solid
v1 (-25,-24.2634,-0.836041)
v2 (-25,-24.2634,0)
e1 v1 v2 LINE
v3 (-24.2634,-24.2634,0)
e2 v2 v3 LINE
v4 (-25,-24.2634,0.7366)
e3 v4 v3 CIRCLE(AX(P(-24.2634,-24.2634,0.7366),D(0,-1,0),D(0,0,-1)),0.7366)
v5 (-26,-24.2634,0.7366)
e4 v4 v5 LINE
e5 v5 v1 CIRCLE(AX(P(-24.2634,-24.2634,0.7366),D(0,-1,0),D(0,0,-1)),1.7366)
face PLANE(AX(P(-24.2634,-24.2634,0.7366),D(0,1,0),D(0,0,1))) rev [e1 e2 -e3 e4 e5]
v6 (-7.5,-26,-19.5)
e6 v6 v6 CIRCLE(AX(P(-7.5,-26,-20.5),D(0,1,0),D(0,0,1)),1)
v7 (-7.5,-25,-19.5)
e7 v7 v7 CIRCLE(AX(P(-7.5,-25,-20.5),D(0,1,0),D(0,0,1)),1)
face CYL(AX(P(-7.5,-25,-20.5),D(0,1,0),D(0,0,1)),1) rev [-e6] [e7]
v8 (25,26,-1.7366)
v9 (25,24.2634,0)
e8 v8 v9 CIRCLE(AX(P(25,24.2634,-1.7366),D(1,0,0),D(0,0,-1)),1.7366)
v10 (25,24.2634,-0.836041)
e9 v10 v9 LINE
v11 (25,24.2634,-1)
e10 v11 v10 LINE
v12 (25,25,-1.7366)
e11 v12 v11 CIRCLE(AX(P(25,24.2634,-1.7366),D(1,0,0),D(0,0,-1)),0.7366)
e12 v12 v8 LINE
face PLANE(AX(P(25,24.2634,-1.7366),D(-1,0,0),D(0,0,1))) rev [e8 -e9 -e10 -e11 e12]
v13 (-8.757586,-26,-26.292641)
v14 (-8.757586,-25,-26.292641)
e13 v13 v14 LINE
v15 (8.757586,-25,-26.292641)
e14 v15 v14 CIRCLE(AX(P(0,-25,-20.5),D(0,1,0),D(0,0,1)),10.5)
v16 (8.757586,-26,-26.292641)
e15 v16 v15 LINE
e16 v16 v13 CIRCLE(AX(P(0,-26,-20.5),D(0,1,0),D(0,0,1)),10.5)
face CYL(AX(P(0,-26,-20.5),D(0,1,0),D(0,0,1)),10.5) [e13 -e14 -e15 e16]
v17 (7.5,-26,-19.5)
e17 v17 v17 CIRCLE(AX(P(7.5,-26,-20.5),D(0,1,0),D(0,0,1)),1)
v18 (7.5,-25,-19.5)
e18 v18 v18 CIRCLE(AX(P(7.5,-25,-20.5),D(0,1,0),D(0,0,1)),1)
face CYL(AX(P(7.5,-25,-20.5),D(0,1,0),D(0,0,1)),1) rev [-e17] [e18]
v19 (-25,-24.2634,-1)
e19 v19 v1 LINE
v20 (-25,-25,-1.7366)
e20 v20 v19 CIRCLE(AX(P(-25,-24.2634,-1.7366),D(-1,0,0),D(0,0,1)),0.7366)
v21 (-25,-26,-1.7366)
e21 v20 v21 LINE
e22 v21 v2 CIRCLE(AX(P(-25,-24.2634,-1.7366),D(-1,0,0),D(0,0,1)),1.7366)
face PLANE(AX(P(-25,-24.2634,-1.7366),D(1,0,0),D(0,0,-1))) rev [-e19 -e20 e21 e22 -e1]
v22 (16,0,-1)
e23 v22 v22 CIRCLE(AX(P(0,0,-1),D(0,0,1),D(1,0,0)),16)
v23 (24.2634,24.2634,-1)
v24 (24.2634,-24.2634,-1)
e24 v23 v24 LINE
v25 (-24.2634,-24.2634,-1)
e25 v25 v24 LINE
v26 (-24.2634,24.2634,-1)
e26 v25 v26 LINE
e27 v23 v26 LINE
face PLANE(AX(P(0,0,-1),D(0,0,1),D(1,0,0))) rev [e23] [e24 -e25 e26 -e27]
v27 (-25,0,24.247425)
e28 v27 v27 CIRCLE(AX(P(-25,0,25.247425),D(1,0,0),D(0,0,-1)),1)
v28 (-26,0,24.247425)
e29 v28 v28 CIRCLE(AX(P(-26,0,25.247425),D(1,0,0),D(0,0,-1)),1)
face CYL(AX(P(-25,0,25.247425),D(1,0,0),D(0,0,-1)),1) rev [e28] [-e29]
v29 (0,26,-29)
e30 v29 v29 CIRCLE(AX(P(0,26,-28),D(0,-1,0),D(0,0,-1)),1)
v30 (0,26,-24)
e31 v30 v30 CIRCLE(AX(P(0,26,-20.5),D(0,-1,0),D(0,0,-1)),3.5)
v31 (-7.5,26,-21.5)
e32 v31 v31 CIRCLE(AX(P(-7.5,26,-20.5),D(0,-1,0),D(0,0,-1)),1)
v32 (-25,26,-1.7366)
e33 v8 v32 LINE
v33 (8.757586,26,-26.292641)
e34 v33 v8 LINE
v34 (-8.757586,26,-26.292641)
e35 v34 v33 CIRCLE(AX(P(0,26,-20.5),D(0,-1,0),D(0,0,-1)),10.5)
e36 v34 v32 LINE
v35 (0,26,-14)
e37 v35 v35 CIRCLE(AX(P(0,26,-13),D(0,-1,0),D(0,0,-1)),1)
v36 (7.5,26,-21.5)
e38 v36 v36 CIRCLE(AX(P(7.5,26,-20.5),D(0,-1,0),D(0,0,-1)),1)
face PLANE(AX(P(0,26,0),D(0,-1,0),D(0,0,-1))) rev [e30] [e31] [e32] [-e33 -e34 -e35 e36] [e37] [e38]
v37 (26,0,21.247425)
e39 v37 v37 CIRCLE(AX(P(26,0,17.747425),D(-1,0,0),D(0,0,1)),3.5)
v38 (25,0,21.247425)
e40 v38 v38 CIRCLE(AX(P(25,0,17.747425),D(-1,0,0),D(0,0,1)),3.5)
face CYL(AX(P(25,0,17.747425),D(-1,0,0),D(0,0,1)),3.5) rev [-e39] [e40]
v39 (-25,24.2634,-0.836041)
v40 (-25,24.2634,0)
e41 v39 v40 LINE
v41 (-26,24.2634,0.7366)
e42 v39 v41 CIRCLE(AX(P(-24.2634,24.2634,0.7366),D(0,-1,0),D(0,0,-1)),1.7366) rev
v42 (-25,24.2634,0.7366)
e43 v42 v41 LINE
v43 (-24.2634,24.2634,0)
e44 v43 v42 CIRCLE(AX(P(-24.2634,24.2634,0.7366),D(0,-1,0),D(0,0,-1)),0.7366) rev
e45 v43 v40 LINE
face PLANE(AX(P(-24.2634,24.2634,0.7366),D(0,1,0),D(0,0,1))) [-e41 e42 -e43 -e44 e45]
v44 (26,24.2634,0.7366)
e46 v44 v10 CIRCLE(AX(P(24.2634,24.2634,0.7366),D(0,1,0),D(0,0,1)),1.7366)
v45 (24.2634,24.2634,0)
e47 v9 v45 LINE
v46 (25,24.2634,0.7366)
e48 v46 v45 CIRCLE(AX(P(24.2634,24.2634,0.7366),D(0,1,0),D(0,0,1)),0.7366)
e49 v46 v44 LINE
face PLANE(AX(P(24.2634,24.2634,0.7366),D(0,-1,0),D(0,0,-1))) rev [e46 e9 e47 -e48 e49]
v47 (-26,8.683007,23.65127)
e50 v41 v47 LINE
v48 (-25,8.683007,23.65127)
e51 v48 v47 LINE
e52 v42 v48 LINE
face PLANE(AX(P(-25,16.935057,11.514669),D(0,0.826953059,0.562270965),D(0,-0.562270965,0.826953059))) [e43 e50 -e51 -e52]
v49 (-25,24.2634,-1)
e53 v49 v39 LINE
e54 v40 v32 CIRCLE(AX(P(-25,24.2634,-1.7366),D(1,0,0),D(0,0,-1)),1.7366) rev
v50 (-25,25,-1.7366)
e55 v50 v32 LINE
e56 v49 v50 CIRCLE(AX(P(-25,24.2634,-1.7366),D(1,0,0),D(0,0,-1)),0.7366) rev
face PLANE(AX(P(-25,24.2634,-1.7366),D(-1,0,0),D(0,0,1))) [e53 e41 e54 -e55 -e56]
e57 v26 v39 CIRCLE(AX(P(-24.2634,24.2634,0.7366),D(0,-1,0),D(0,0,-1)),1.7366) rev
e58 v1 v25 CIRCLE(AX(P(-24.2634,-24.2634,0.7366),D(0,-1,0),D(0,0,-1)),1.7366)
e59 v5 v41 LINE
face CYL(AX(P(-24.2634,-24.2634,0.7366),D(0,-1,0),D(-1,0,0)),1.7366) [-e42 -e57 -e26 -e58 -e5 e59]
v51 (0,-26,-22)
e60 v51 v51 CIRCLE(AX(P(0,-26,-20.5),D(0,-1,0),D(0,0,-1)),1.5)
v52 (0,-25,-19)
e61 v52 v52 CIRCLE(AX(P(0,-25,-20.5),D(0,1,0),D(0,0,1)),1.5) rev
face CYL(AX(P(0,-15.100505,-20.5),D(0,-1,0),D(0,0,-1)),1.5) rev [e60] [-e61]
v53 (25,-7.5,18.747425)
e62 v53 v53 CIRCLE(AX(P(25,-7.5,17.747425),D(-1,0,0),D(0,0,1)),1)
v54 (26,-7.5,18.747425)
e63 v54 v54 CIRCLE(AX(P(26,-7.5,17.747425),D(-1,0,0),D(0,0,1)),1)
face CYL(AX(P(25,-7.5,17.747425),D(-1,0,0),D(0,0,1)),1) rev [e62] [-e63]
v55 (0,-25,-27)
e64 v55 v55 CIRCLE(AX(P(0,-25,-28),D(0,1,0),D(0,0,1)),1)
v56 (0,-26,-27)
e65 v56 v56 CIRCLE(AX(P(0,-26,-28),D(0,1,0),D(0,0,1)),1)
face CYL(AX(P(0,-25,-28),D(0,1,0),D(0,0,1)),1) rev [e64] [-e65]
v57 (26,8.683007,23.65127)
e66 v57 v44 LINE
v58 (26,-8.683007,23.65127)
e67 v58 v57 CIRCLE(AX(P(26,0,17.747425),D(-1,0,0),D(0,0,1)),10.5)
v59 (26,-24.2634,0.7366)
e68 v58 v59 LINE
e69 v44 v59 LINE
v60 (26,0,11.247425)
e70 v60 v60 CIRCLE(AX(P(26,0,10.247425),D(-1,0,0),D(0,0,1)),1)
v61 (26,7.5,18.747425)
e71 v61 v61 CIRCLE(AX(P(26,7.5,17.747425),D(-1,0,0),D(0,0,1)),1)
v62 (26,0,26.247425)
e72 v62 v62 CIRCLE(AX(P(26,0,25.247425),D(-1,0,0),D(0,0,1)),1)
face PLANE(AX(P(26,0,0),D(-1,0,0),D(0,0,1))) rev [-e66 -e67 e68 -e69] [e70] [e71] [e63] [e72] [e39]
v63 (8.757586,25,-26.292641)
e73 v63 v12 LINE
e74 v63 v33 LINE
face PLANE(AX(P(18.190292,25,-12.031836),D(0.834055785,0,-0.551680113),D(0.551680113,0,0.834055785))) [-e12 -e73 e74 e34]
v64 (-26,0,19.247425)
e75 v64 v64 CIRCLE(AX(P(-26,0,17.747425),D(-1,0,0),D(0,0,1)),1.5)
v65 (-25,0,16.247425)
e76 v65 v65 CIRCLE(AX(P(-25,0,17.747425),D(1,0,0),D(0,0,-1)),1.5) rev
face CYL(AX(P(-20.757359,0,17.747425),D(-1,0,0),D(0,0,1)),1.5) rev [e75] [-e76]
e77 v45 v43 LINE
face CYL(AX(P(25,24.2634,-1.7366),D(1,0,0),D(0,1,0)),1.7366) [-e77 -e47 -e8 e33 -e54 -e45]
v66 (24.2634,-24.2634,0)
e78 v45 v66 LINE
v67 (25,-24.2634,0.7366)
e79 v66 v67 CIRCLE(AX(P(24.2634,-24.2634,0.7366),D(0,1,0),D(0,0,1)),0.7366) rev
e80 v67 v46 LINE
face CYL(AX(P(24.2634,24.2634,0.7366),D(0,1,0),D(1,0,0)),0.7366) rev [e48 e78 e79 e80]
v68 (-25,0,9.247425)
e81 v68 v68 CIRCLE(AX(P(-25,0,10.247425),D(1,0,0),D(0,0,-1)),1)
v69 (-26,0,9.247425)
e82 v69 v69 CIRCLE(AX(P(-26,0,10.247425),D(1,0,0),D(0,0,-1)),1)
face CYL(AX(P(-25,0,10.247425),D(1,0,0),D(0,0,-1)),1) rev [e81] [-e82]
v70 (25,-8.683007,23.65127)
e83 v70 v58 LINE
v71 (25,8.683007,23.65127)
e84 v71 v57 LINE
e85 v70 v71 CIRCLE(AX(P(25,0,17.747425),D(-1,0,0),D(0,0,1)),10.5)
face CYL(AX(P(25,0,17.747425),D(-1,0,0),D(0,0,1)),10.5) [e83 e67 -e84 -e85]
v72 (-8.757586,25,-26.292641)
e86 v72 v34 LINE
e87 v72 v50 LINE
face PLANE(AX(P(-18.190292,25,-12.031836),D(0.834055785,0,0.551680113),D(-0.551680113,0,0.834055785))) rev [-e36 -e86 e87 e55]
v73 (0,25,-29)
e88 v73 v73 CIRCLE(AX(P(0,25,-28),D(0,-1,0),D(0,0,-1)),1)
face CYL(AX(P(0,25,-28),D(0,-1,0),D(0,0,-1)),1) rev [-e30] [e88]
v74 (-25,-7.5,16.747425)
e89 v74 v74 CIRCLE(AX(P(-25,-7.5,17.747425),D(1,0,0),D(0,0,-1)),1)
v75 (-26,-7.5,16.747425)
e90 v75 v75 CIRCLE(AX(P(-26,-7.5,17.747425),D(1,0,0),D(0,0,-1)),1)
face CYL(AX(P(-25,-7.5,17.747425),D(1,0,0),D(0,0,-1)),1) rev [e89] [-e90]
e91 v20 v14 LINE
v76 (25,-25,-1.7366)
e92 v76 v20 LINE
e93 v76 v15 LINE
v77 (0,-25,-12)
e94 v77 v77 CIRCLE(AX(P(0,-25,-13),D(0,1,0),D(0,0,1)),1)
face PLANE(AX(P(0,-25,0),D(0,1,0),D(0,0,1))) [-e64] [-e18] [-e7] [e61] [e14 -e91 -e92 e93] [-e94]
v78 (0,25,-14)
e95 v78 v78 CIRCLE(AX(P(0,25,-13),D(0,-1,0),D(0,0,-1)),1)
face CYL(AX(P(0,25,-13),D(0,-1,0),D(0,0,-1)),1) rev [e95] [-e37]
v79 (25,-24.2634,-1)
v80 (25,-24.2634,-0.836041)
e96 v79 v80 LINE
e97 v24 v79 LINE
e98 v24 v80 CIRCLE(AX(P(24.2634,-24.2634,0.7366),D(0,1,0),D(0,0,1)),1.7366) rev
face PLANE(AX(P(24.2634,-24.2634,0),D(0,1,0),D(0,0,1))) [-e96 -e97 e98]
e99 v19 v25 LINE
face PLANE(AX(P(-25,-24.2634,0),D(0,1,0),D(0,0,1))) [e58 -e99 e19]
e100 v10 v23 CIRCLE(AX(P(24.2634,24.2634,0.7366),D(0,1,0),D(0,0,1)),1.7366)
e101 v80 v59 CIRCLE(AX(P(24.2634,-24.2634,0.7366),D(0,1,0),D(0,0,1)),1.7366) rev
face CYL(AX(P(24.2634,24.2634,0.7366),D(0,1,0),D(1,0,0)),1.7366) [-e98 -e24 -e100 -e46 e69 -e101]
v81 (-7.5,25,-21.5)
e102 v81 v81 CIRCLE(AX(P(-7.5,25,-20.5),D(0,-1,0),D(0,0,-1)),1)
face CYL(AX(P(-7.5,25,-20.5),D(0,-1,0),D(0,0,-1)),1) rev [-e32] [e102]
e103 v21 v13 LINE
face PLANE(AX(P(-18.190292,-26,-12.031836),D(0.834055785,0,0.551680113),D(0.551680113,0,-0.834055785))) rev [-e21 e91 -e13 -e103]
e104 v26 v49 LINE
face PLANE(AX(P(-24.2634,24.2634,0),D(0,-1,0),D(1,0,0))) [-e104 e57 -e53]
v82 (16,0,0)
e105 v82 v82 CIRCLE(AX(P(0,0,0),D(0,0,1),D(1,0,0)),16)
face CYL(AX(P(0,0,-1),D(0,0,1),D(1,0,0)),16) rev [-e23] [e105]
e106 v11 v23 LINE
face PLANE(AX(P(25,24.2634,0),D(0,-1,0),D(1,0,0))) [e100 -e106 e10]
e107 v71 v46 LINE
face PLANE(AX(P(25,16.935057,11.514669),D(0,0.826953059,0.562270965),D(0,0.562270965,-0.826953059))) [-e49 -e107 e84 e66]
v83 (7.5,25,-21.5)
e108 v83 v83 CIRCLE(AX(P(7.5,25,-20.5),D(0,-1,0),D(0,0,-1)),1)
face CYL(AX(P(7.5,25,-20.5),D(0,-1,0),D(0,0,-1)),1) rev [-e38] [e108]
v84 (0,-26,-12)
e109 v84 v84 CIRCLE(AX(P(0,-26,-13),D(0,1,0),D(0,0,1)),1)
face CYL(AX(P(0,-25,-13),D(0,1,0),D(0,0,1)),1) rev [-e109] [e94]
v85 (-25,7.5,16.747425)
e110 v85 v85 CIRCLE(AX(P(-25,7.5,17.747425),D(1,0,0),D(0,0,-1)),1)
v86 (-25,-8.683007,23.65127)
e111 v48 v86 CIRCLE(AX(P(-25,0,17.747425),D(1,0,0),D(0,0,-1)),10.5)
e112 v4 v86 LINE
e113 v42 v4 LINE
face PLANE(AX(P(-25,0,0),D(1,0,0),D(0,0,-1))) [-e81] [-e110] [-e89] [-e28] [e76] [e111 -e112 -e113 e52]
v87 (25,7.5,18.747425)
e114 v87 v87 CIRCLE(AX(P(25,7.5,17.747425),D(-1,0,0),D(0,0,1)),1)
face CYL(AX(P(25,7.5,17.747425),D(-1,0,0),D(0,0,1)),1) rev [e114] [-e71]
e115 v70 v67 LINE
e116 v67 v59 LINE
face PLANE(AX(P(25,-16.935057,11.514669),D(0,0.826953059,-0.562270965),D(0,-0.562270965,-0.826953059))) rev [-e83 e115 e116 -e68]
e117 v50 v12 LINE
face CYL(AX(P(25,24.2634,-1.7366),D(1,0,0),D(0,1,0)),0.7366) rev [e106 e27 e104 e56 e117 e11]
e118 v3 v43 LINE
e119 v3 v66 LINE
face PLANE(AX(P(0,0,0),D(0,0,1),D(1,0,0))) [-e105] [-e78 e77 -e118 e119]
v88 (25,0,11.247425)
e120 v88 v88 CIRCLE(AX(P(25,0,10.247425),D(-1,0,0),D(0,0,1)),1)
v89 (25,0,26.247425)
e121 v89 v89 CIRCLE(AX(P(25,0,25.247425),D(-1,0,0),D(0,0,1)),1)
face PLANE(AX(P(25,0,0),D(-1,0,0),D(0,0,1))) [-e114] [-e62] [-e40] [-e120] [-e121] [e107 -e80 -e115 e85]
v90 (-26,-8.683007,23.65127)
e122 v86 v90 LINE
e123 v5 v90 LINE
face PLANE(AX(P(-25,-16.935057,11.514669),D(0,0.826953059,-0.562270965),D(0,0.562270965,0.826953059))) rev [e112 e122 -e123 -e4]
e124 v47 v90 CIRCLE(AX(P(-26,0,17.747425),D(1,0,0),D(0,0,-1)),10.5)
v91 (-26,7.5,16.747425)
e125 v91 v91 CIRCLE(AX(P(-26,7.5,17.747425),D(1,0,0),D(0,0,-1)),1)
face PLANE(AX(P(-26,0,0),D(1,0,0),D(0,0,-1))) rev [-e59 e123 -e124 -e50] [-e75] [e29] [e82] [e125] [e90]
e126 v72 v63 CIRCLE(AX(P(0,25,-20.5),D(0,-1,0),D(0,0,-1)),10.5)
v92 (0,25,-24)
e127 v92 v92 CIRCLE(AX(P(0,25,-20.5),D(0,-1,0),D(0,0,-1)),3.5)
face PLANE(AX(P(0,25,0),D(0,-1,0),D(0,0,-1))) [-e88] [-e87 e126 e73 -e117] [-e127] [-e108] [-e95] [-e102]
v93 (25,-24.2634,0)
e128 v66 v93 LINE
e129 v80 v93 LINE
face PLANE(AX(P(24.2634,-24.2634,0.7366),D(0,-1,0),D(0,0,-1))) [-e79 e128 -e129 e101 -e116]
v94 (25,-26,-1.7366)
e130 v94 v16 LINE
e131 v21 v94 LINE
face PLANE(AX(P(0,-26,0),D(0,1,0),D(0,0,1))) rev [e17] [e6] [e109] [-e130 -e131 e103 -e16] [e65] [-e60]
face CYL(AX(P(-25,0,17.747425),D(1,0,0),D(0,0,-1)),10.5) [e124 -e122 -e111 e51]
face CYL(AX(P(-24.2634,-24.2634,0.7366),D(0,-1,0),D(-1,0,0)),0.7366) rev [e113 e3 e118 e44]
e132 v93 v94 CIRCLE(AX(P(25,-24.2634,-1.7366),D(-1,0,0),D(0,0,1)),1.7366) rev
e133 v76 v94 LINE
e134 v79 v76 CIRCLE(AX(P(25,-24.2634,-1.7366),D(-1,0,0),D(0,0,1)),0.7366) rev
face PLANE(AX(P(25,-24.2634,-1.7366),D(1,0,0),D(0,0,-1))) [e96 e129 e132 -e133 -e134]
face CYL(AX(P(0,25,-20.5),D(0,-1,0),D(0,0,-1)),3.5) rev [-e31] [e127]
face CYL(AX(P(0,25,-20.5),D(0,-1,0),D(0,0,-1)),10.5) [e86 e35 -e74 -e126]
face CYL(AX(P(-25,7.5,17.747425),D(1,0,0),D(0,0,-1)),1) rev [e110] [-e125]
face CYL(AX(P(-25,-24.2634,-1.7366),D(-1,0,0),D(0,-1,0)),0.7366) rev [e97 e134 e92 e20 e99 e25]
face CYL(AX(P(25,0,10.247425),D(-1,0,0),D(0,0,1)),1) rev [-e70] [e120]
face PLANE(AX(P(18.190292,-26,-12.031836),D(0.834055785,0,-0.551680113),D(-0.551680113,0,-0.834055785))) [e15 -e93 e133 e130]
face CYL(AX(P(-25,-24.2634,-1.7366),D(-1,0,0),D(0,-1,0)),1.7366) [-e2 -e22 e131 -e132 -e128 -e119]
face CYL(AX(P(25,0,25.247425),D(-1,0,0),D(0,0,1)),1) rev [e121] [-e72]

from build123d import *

# Parameters (mm, degrees)
SKETCH_1_W                         = 50
SKETCH_1_H                         = 50
SKETCH_1_R                         = 16
SM_BASE_FLANGE_1_DEPTH             = 1
SM_EDGE_FLANGE_1_STRIP_W           = 5.4732
SM_EDGE_FLANGE_1_STRIP_H           = 1
SM_EDGE_FLANGE_1_STRIP_CUT_DEPTH   = 50
SM_EDGE_FLANGE_1_STRIP_2_W         = 5.4732
SM_EDGE_FLANGE_1_STRIP_2_H         = 1
SM_EDGE_FLANGE_1_STRIP_CUT_2_DEPTH = 50
SM_EDGE_FLANGE_1_DEPTH             = 50
SM_EDGE_FLANGE_1_BEND_DEPTH        = 50
SM_EDGE_FLANGE_2_STRIP_W           = 5.4732
SM_EDGE_FLANGE_2_STRIP_H           = 1
SM_EDGE_FLANGE_2_STRIP_CUT_DEPTH   = 48.5268
SM_EDGE_FLANGE_2_STRIP_2_W         = 5.4732
SM_EDGE_FLANGE_2_STRIP_2_H         = 1
SM_EDGE_FLANGE_2_STRIP_CUT_2_DEPTH = 48.5268
SM_EDGE_FLANGE_2_DEPTH             = 48.5268
SM_EDGE_FLANGE_2_BEND_DEPTH        = 48.5268
SKETCH_23_R                        = 1
CUT_EXTRUDE_1_DEPTH                = 98
CUT_EXTRUDE_3_REACH                = 67.886
SKETCH_27_R                        = 3.5
SKETCH_27_R_2                      = 1
EXTRUDE_START                      = -1
SKETCH_30_R                        = 3.5
SKETCH_30_R_2                      = 1.5
EXTRUDE_1_DEPTH                    = 1
SKETCH_33_R                        = 3.5
EXTRUDE_2_DEPTH                    = 1
SKETCH_36_R                        = 1.5
CUT_EXTRUDE_4_DEPTH                = 1


# Sheet-metal steps are written as plain solids
with BuildPart() as part:
    # Sketch 1 → 基材-凸緣1 (new body)
    with BuildSketch(Plane.XY):
        Rectangle(SKETCH_1_W, SKETCH_1_H)
        Circle(SKETCH_1_R, mode=Mode.SUBTRACT)
    extrude(amount=-SM_BASE_FLANGE_1_DEPTH)

    # 邊線-凸緣1 strip (across the edge) → 邊線-凸緣1 strip cut (cut)
    with BuildSketch(Plane(origin=(-25, 25, -1), x_dir=(0, -1, 0), z_dir=(1, 0, 0))):
        with Locations((-2, -0.5)):
            Rectangle(SM_EDGE_FLANGE_1_STRIP_W, SM_EDGE_FLANGE_1_STRIP_H)
    extrude(amount=SM_EDGE_FLANGE_1_STRIP_CUT_DEPTH, mode=Mode.SUBTRACT)

    # 邊線-凸緣1 strip 2 (across the edge) → 邊線-凸緣1 strip cut 2 (cut)
    with BuildSketch(Plane(origin=(25, -25, -1), x_dir=(0, 1, 0), z_dir=(-1, 0, 0))):
        with Locations((-2, -0.5)):
            Rectangle(SM_EDGE_FLANGE_1_STRIP_2_W, SM_EDGE_FLANGE_1_STRIP_2_H)
    extrude(amount=SM_EDGE_FLANGE_1_STRIP_CUT_2_DEPTH, mode=Mode.SUBTRACT)

    # 邊線-凸緣1 section (across the edge) → 邊線-凸緣1 (add)
    with BuildSketch(Plane(origin=(-25, 25, -1), x_dir=(0, -1, 0), z_dir=(1, 0, 0))):
        with BuildLine():
            Line((-1, 0.7366), (-1, 30))
            Line((-1, 30), (0, 30))
            Line((0, 30), (0, 0.7366))
            ThreePointArc((0, 0.7366), (0.215745145, 0.215745145), (0.7366, 0))
            Line((0.7366, 0), (0.7366, -1))
            ThreePointArc((0.7366, -1), (-0.491361636, -0.491361636), (-1, 0.7366))
        make_face()
    extrude(amount=SM_EDGE_FLANGE_1_DEPTH)

    # 邊線-凸緣1 section 2 (across the edge) → 邊線-凸緣1 bend (add)
    with BuildSketch(Plane(origin=(25, -25, -1), x_dir=(0, 1, 0), z_dir=(-1, 0, 0))):
        with BuildLine():
            Line((-1, 0.7366), (-1, 30))
            Line((-1, 30), (0, 30))
            Line((0, 30), (0, 0.7366))
            ThreePointArc((0, 0.7366), (0.215745145, 0.215745145), (0.7366, 0))
            Line((0.7366, 0), (0.7366, -1))
            ThreePointArc((0.7366, -1), (-0.491361636, -0.491361636), (-1, 0.7366))
        make_face()
    extrude(amount=SM_EDGE_FLANGE_1_BEND_DEPTH)

    # 邊線-凸緣2 strip (across the edge) → 邊線-凸緣2 strip cut (cut)
    with BuildSketch(Plane(origin=(25, -24.2634, 0), x_dir=(-1, 0, 0), z_dir=(0, 1, 0))):
        with Locations((-2, -0.5)):
            Rectangle(SM_EDGE_FLANGE_2_STRIP_W, SM_EDGE_FLANGE_2_STRIP_H)
    extrude(amount=SM_EDGE_FLANGE_2_STRIP_CUT_DEPTH, mode=Mode.SUBTRACT)

    # 邊線-凸緣2 strip 2 (across the edge) → 邊線-凸緣2 strip cut 2 (cut)
    with BuildSketch(Plane(origin=(-25, 24.2634, 0), x_dir=(1, 0, 0), z_dir=(0, -1, 0))):
        with Locations((-2, -0.5)):
            Rectangle(SM_EDGE_FLANGE_2_STRIP_2_W, SM_EDGE_FLANGE_2_STRIP_2_H)
    extrude(amount=SM_EDGE_FLANGE_2_STRIP_CUT_2_DEPTH, mode=Mode.SUBTRACT)

    # 邊線-凸緣2 section (across the edge) → 邊線-凸緣2 (add)
    with BuildSketch(Plane(origin=(25, -24.2634, 0), x_dir=(-1, 0, 0), z_dir=(0, 1, 0))):
        with BuildLine():
            Line((-1, 0.7366), (-1, 30))
            Line((-1, 30), (0, 30))
            Line((0, 30), (0, 0.7366))
            ThreePointArc((0, 0.7366), (0.215745145, 0.215745145), (0.7366, 0))
            Line((0.7366, 0), (0.7366, -1))
            ThreePointArc((0.7366, -1), (-0.491361636, -0.491361636), (-1, 0.7366))
        make_face()
    extrude(amount=SM_EDGE_FLANGE_2_DEPTH)

    # 邊線-凸緣2 section 2 (across the edge) → 邊線-凸緣2 bend (add)
    with BuildSketch(Plane(origin=(-25, 24.2634, 0), x_dir=(1, 0, 0), z_dir=(0, -1, 0))):
        with BuildLine():
            Line((-1, 0.7366), (-1, 30))
            Line((-1, 30), (0, 30))
            Line((0, 30), (0, 0.7366))
            ThreePointArc((0, 0.7366), (0.215745145, 0.215745145), (0.7366, 0))
            Line((0.7366, 0), (0.7366, -1))
            ThreePointArc((0.7366, -1), (-0.491361636, -0.491361636), (-1, 0.7366))
        make_face()
    extrude(amount=SM_EDGE_FLANGE_2_BEND_DEPTH)

    # 草圖23 → 除料-伸長1 (cut)
    with BuildSketch(Plane(origin=(0, 26, 0), x_dir=(1, 0, 0), z_dir=(0, 1, 0))):
        with BuildLine():
            Line((25, 31), (0, 31))
            ThreePointArc((0, 31), (4.971280899, 29.748587256), (8.757585745, 26.292641186))
            Line((8.757585745, 26.292641186), (25, 1.7366))
            Line((25, 1.7366), (25, 31))
        make_face()
        with BuildLine():
            ThreePointArc((-8.757585745, 26.292641186), (-4.971280899, 29.748587256), (0, 31))
            Line((0, 31), (-25, 31))
            Line((-25, 31), (-25, 1.7366))
            Line((-25, 1.7366), (-8.757585745, 26.292641186))
        make_face()
        with BuildLine():
            ThreePointArc((1, 28), (0.707106781, 28.707106781), (0, 29))
            Line((0, 29), (0, 27))
            ThreePointArc((0, 27), (0.707106781, 27.292893219), (1, 28))
        make_face()
        with BuildLine():
            Line((0, 27), (0, 29))
            ThreePointArc((0, 29), (-1, 28), (0, 27))
        make_face()
        with Locations(Location((-7.5, 20.5, 0), (0, 0, 90))):
            Circle(SKETCH_23_R)
        with Locations(Location((7.5, 20.5, 0), (0, 0, 90))):
            Circle(SKETCH_23_R)
        with BuildLine():
            ThreePointArc((1, 13), (0.707106781, 13.707106781), (0, 14))
            Line((0, 14), (0, 12))
            ThreePointArc((0, 12), (0.707106781, 12.292893219), (1, 13))
        make_face()
        with BuildLine():
            Line((0, 12), (0, 14))
            ThreePointArc((0, 14), (-1, 13), (0, 12))
        make_face()
        with BuildLine():
            ThreePointArc((3.5, 20.5), (2.474873734, 22.974873734), (0, 24))
            Line((0, 24), (0, 17))
            ThreePointArc((0, 17), (2.474873734, 18.025126266), (3.5, 20.5))
        make_face()
        with BuildLine():
            Line((0, 17), (0, 24))
            ThreePointArc((0, 24), (-3.5, 20.5), (0, 17))
        make_face()
    extrude(amount=-CUT_EXTRUDE_1_DEPTH, mode=Mode.SUBTRACT)

    # 除料-伸長3: up to this face of the body (flat: up to its plane)
    cut_extrude_3_end = Plane(part.part.faces().sort_by_distance((-26, 0, 15.3683))[0])
    # 草圖27 → 除料-伸長3 (cut, up to the picked face)
    with BuildSketch(Plane(origin=(26, 0, 0), x_dir=(0, 0, -1), z_dir=(1, 0, 0)), mode=Mode.PRIVATE) as cut_extrude_3_sk1:
        with BuildLine():
            Line((-30, -24.2634), (-0.7366, -24.2634))
            Line((-0.7366, -24.2634), (-23.651269893, -8.68300712))
            ThreePointArc((-23.651269893, -8.68300712), (-28.24742476, 0), (-23.651269893, 8.68300712))
            Line((-23.651269893, 8.68300712), (-0.7366, 24.2634))
            Line((-0.7366, 24.2634), (-30, 24.2634))
            Line((-30, 24.2634), (-30, -24.2634))
        make_face()
    cut_extrude_3_tool1 = split(extrude(cut_extrude_3_sk1.sketch, amount=-CUT_EXTRUDE_3_REACH, mode=Mode.PRIVATE), bisect_by=cut_extrude_3_end, keep=Keep.BOTH, mode=Mode.PRIVATE)
    # 草圖27 → 除料-伸長3 (cut, up to the picked face)
    with BuildSketch(Plane(origin=(26, 0, 0), x_dir=(0, 0, -1), z_dir=(1, 0, 0)), mode=Mode.PRIVATE) as cut_extrude_3_sk2:
        with Locations(Location((-17.74742476, 0, 0), (0, 0, 180))):
            Circle(SKETCH_27_R)
    cut_extrude_3_tool2 = split(extrude(cut_extrude_3_sk2.sketch, amount=-CUT_EXTRUDE_3_REACH, mode=Mode.PRIVATE), bisect_by=cut_extrude_3_end, keep=Keep.BOTH, mode=Mode.PRIVATE)
    # 草圖27 → 除料-伸長3 (cut, up to the picked face)
    with BuildSketch(Plane(origin=(26, 0, 0), x_dir=(0, 0, -1), z_dir=(1, 0, 0)), mode=Mode.PRIVATE) as cut_extrude_3_sk3:
        with Locations(Location((-17.74742476, -7.5, 0), (0, 0, 180))):
            Circle(SKETCH_27_R_2)
    cut_extrude_3_tool3 = split(extrude(cut_extrude_3_sk3.sketch, amount=-CUT_EXTRUDE_3_REACH, mode=Mode.PRIVATE), bisect_by=cut_extrude_3_end, keep=Keep.BOTH, mode=Mode.PRIVATE)
    # 草圖27 → 除料-伸長3 (cut, up to the picked face)
    with BuildSketch(Plane(origin=(26, 0, 0), x_dir=(0, 0, -1), z_dir=(1, 0, 0)), mode=Mode.PRIVATE) as cut_extrude_3_sk4:
        with Locations(Location((-25.24742476, 0, 0), (0, 0, 180))):
            Circle(SKETCH_27_R_2)
    cut_extrude_3_tool4 = split(extrude(cut_extrude_3_sk4.sketch, amount=-CUT_EXTRUDE_3_REACH, mode=Mode.PRIVATE), bisect_by=cut_extrude_3_end, keep=Keep.BOTH, mode=Mode.PRIVATE)
    # 草圖27 → 除料-伸長3 (cut, up to the picked face)
    with BuildSketch(Plane(origin=(26, 0, 0), x_dir=(0, 0, -1), z_dir=(1, 0, 0)), mode=Mode.PRIVATE) as cut_extrude_3_sk5:
        with Locations(Location((-17.74742476, 7.5, 0), (0, 0, 180))):
            Circle(SKETCH_27_R_2)
    cut_extrude_3_tool5 = split(extrude(cut_extrude_3_sk5.sketch, amount=-CUT_EXTRUDE_3_REACH, mode=Mode.PRIVATE), bisect_by=cut_extrude_3_end, keep=Keep.BOTH, mode=Mode.PRIVATE)
    # 草圖27 → 除料-伸長3 (cut, up to the picked face)
    with BuildSketch(Plane(origin=(26, 0, 0), x_dir=(0, 0, -1), z_dir=(1, 0, 0)), mode=Mode.PRIVATE) as cut_extrude_3_sk6:
        with Locations(Location((-10.24742476, 0, 0), (0, 0, 180))):
            Circle(SKETCH_27_R_2)
    cut_extrude_3_tool6 = split(extrude(cut_extrude_3_sk6.sketch, amount=-CUT_EXTRUDE_3_REACH, mode=Mode.PRIVATE), bisect_by=cut_extrude_3_end, keep=Keep.BOTH, mode=Mode.PRIVATE)
    add(cut_extrude_3_tool1.solids().sort_by(Axis((26, -23.696726, 15.3683), (-1, 0, 0)))[0], mode=Mode.SUBTRACT)
    add(cut_extrude_3_tool2.solids().sort_by(Axis((26, 0, 17.747425), (-1, 0, 0)))[0], mode=Mode.SUBTRACT)
    add(cut_extrude_3_tool3.solids().sort_by(Axis((26, -7.5, 17.747425), (-1, 0, 0)))[0], mode=Mode.SUBTRACT)
    add(cut_extrude_3_tool4.solids().sort_by(Axis((26, 0, 25.247425), (-1, 0, 0)))[0], mode=Mode.SUBTRACT)
    add(cut_extrude_3_tool5.solids().sort_by(Axis((26, 7.5, 17.747425), (-1, 0, 0)))[0], mode=Mode.SUBTRACT)
    add(cut_extrude_3_tool6.solids().sort_by(Axis((26, 0, 10.247425), (-1, 0, 0)))[0], mode=Mode.SUBTRACT)

    # 草圖30 → 填料-伸長1 (add)
    with BuildSketch(Plane.XZ.offset(26).offset(EXTRUDE_START)):
        with Locations(Location((0, -20.5, 0), (0, 0, 270))):
            Circle(SKETCH_30_R)
        with Locations(Location((0, -20.5, 0), (0, 0, 270))):
            Circle(SKETCH_30_R_2, mode=Mode.SUBTRACT)
    extrude(amount=EXTRUDE_1_DEPTH)

    # 草圖33 → 填料-伸長2 (add)
    with BuildSketch(Plane.ZY.offset(26).offset(EXTRUDE_START)):
        with Locations((17.74742476, 0)):
            Circle(SKETCH_33_R)
    extrude(amount=EXTRUDE_2_DEPTH)

    # 草圖36 → 除料-伸長4 (cut)
    with BuildSketch(Plane.ZY.offset(26)):
        with Locations((17.74742476, 0)):
            Circle(SKETCH_36_R)
    extrude(amount=-CUT_EXTRUDE_4_DEPTH, mode=Mode.SUBTRACT)


solid = part.part
